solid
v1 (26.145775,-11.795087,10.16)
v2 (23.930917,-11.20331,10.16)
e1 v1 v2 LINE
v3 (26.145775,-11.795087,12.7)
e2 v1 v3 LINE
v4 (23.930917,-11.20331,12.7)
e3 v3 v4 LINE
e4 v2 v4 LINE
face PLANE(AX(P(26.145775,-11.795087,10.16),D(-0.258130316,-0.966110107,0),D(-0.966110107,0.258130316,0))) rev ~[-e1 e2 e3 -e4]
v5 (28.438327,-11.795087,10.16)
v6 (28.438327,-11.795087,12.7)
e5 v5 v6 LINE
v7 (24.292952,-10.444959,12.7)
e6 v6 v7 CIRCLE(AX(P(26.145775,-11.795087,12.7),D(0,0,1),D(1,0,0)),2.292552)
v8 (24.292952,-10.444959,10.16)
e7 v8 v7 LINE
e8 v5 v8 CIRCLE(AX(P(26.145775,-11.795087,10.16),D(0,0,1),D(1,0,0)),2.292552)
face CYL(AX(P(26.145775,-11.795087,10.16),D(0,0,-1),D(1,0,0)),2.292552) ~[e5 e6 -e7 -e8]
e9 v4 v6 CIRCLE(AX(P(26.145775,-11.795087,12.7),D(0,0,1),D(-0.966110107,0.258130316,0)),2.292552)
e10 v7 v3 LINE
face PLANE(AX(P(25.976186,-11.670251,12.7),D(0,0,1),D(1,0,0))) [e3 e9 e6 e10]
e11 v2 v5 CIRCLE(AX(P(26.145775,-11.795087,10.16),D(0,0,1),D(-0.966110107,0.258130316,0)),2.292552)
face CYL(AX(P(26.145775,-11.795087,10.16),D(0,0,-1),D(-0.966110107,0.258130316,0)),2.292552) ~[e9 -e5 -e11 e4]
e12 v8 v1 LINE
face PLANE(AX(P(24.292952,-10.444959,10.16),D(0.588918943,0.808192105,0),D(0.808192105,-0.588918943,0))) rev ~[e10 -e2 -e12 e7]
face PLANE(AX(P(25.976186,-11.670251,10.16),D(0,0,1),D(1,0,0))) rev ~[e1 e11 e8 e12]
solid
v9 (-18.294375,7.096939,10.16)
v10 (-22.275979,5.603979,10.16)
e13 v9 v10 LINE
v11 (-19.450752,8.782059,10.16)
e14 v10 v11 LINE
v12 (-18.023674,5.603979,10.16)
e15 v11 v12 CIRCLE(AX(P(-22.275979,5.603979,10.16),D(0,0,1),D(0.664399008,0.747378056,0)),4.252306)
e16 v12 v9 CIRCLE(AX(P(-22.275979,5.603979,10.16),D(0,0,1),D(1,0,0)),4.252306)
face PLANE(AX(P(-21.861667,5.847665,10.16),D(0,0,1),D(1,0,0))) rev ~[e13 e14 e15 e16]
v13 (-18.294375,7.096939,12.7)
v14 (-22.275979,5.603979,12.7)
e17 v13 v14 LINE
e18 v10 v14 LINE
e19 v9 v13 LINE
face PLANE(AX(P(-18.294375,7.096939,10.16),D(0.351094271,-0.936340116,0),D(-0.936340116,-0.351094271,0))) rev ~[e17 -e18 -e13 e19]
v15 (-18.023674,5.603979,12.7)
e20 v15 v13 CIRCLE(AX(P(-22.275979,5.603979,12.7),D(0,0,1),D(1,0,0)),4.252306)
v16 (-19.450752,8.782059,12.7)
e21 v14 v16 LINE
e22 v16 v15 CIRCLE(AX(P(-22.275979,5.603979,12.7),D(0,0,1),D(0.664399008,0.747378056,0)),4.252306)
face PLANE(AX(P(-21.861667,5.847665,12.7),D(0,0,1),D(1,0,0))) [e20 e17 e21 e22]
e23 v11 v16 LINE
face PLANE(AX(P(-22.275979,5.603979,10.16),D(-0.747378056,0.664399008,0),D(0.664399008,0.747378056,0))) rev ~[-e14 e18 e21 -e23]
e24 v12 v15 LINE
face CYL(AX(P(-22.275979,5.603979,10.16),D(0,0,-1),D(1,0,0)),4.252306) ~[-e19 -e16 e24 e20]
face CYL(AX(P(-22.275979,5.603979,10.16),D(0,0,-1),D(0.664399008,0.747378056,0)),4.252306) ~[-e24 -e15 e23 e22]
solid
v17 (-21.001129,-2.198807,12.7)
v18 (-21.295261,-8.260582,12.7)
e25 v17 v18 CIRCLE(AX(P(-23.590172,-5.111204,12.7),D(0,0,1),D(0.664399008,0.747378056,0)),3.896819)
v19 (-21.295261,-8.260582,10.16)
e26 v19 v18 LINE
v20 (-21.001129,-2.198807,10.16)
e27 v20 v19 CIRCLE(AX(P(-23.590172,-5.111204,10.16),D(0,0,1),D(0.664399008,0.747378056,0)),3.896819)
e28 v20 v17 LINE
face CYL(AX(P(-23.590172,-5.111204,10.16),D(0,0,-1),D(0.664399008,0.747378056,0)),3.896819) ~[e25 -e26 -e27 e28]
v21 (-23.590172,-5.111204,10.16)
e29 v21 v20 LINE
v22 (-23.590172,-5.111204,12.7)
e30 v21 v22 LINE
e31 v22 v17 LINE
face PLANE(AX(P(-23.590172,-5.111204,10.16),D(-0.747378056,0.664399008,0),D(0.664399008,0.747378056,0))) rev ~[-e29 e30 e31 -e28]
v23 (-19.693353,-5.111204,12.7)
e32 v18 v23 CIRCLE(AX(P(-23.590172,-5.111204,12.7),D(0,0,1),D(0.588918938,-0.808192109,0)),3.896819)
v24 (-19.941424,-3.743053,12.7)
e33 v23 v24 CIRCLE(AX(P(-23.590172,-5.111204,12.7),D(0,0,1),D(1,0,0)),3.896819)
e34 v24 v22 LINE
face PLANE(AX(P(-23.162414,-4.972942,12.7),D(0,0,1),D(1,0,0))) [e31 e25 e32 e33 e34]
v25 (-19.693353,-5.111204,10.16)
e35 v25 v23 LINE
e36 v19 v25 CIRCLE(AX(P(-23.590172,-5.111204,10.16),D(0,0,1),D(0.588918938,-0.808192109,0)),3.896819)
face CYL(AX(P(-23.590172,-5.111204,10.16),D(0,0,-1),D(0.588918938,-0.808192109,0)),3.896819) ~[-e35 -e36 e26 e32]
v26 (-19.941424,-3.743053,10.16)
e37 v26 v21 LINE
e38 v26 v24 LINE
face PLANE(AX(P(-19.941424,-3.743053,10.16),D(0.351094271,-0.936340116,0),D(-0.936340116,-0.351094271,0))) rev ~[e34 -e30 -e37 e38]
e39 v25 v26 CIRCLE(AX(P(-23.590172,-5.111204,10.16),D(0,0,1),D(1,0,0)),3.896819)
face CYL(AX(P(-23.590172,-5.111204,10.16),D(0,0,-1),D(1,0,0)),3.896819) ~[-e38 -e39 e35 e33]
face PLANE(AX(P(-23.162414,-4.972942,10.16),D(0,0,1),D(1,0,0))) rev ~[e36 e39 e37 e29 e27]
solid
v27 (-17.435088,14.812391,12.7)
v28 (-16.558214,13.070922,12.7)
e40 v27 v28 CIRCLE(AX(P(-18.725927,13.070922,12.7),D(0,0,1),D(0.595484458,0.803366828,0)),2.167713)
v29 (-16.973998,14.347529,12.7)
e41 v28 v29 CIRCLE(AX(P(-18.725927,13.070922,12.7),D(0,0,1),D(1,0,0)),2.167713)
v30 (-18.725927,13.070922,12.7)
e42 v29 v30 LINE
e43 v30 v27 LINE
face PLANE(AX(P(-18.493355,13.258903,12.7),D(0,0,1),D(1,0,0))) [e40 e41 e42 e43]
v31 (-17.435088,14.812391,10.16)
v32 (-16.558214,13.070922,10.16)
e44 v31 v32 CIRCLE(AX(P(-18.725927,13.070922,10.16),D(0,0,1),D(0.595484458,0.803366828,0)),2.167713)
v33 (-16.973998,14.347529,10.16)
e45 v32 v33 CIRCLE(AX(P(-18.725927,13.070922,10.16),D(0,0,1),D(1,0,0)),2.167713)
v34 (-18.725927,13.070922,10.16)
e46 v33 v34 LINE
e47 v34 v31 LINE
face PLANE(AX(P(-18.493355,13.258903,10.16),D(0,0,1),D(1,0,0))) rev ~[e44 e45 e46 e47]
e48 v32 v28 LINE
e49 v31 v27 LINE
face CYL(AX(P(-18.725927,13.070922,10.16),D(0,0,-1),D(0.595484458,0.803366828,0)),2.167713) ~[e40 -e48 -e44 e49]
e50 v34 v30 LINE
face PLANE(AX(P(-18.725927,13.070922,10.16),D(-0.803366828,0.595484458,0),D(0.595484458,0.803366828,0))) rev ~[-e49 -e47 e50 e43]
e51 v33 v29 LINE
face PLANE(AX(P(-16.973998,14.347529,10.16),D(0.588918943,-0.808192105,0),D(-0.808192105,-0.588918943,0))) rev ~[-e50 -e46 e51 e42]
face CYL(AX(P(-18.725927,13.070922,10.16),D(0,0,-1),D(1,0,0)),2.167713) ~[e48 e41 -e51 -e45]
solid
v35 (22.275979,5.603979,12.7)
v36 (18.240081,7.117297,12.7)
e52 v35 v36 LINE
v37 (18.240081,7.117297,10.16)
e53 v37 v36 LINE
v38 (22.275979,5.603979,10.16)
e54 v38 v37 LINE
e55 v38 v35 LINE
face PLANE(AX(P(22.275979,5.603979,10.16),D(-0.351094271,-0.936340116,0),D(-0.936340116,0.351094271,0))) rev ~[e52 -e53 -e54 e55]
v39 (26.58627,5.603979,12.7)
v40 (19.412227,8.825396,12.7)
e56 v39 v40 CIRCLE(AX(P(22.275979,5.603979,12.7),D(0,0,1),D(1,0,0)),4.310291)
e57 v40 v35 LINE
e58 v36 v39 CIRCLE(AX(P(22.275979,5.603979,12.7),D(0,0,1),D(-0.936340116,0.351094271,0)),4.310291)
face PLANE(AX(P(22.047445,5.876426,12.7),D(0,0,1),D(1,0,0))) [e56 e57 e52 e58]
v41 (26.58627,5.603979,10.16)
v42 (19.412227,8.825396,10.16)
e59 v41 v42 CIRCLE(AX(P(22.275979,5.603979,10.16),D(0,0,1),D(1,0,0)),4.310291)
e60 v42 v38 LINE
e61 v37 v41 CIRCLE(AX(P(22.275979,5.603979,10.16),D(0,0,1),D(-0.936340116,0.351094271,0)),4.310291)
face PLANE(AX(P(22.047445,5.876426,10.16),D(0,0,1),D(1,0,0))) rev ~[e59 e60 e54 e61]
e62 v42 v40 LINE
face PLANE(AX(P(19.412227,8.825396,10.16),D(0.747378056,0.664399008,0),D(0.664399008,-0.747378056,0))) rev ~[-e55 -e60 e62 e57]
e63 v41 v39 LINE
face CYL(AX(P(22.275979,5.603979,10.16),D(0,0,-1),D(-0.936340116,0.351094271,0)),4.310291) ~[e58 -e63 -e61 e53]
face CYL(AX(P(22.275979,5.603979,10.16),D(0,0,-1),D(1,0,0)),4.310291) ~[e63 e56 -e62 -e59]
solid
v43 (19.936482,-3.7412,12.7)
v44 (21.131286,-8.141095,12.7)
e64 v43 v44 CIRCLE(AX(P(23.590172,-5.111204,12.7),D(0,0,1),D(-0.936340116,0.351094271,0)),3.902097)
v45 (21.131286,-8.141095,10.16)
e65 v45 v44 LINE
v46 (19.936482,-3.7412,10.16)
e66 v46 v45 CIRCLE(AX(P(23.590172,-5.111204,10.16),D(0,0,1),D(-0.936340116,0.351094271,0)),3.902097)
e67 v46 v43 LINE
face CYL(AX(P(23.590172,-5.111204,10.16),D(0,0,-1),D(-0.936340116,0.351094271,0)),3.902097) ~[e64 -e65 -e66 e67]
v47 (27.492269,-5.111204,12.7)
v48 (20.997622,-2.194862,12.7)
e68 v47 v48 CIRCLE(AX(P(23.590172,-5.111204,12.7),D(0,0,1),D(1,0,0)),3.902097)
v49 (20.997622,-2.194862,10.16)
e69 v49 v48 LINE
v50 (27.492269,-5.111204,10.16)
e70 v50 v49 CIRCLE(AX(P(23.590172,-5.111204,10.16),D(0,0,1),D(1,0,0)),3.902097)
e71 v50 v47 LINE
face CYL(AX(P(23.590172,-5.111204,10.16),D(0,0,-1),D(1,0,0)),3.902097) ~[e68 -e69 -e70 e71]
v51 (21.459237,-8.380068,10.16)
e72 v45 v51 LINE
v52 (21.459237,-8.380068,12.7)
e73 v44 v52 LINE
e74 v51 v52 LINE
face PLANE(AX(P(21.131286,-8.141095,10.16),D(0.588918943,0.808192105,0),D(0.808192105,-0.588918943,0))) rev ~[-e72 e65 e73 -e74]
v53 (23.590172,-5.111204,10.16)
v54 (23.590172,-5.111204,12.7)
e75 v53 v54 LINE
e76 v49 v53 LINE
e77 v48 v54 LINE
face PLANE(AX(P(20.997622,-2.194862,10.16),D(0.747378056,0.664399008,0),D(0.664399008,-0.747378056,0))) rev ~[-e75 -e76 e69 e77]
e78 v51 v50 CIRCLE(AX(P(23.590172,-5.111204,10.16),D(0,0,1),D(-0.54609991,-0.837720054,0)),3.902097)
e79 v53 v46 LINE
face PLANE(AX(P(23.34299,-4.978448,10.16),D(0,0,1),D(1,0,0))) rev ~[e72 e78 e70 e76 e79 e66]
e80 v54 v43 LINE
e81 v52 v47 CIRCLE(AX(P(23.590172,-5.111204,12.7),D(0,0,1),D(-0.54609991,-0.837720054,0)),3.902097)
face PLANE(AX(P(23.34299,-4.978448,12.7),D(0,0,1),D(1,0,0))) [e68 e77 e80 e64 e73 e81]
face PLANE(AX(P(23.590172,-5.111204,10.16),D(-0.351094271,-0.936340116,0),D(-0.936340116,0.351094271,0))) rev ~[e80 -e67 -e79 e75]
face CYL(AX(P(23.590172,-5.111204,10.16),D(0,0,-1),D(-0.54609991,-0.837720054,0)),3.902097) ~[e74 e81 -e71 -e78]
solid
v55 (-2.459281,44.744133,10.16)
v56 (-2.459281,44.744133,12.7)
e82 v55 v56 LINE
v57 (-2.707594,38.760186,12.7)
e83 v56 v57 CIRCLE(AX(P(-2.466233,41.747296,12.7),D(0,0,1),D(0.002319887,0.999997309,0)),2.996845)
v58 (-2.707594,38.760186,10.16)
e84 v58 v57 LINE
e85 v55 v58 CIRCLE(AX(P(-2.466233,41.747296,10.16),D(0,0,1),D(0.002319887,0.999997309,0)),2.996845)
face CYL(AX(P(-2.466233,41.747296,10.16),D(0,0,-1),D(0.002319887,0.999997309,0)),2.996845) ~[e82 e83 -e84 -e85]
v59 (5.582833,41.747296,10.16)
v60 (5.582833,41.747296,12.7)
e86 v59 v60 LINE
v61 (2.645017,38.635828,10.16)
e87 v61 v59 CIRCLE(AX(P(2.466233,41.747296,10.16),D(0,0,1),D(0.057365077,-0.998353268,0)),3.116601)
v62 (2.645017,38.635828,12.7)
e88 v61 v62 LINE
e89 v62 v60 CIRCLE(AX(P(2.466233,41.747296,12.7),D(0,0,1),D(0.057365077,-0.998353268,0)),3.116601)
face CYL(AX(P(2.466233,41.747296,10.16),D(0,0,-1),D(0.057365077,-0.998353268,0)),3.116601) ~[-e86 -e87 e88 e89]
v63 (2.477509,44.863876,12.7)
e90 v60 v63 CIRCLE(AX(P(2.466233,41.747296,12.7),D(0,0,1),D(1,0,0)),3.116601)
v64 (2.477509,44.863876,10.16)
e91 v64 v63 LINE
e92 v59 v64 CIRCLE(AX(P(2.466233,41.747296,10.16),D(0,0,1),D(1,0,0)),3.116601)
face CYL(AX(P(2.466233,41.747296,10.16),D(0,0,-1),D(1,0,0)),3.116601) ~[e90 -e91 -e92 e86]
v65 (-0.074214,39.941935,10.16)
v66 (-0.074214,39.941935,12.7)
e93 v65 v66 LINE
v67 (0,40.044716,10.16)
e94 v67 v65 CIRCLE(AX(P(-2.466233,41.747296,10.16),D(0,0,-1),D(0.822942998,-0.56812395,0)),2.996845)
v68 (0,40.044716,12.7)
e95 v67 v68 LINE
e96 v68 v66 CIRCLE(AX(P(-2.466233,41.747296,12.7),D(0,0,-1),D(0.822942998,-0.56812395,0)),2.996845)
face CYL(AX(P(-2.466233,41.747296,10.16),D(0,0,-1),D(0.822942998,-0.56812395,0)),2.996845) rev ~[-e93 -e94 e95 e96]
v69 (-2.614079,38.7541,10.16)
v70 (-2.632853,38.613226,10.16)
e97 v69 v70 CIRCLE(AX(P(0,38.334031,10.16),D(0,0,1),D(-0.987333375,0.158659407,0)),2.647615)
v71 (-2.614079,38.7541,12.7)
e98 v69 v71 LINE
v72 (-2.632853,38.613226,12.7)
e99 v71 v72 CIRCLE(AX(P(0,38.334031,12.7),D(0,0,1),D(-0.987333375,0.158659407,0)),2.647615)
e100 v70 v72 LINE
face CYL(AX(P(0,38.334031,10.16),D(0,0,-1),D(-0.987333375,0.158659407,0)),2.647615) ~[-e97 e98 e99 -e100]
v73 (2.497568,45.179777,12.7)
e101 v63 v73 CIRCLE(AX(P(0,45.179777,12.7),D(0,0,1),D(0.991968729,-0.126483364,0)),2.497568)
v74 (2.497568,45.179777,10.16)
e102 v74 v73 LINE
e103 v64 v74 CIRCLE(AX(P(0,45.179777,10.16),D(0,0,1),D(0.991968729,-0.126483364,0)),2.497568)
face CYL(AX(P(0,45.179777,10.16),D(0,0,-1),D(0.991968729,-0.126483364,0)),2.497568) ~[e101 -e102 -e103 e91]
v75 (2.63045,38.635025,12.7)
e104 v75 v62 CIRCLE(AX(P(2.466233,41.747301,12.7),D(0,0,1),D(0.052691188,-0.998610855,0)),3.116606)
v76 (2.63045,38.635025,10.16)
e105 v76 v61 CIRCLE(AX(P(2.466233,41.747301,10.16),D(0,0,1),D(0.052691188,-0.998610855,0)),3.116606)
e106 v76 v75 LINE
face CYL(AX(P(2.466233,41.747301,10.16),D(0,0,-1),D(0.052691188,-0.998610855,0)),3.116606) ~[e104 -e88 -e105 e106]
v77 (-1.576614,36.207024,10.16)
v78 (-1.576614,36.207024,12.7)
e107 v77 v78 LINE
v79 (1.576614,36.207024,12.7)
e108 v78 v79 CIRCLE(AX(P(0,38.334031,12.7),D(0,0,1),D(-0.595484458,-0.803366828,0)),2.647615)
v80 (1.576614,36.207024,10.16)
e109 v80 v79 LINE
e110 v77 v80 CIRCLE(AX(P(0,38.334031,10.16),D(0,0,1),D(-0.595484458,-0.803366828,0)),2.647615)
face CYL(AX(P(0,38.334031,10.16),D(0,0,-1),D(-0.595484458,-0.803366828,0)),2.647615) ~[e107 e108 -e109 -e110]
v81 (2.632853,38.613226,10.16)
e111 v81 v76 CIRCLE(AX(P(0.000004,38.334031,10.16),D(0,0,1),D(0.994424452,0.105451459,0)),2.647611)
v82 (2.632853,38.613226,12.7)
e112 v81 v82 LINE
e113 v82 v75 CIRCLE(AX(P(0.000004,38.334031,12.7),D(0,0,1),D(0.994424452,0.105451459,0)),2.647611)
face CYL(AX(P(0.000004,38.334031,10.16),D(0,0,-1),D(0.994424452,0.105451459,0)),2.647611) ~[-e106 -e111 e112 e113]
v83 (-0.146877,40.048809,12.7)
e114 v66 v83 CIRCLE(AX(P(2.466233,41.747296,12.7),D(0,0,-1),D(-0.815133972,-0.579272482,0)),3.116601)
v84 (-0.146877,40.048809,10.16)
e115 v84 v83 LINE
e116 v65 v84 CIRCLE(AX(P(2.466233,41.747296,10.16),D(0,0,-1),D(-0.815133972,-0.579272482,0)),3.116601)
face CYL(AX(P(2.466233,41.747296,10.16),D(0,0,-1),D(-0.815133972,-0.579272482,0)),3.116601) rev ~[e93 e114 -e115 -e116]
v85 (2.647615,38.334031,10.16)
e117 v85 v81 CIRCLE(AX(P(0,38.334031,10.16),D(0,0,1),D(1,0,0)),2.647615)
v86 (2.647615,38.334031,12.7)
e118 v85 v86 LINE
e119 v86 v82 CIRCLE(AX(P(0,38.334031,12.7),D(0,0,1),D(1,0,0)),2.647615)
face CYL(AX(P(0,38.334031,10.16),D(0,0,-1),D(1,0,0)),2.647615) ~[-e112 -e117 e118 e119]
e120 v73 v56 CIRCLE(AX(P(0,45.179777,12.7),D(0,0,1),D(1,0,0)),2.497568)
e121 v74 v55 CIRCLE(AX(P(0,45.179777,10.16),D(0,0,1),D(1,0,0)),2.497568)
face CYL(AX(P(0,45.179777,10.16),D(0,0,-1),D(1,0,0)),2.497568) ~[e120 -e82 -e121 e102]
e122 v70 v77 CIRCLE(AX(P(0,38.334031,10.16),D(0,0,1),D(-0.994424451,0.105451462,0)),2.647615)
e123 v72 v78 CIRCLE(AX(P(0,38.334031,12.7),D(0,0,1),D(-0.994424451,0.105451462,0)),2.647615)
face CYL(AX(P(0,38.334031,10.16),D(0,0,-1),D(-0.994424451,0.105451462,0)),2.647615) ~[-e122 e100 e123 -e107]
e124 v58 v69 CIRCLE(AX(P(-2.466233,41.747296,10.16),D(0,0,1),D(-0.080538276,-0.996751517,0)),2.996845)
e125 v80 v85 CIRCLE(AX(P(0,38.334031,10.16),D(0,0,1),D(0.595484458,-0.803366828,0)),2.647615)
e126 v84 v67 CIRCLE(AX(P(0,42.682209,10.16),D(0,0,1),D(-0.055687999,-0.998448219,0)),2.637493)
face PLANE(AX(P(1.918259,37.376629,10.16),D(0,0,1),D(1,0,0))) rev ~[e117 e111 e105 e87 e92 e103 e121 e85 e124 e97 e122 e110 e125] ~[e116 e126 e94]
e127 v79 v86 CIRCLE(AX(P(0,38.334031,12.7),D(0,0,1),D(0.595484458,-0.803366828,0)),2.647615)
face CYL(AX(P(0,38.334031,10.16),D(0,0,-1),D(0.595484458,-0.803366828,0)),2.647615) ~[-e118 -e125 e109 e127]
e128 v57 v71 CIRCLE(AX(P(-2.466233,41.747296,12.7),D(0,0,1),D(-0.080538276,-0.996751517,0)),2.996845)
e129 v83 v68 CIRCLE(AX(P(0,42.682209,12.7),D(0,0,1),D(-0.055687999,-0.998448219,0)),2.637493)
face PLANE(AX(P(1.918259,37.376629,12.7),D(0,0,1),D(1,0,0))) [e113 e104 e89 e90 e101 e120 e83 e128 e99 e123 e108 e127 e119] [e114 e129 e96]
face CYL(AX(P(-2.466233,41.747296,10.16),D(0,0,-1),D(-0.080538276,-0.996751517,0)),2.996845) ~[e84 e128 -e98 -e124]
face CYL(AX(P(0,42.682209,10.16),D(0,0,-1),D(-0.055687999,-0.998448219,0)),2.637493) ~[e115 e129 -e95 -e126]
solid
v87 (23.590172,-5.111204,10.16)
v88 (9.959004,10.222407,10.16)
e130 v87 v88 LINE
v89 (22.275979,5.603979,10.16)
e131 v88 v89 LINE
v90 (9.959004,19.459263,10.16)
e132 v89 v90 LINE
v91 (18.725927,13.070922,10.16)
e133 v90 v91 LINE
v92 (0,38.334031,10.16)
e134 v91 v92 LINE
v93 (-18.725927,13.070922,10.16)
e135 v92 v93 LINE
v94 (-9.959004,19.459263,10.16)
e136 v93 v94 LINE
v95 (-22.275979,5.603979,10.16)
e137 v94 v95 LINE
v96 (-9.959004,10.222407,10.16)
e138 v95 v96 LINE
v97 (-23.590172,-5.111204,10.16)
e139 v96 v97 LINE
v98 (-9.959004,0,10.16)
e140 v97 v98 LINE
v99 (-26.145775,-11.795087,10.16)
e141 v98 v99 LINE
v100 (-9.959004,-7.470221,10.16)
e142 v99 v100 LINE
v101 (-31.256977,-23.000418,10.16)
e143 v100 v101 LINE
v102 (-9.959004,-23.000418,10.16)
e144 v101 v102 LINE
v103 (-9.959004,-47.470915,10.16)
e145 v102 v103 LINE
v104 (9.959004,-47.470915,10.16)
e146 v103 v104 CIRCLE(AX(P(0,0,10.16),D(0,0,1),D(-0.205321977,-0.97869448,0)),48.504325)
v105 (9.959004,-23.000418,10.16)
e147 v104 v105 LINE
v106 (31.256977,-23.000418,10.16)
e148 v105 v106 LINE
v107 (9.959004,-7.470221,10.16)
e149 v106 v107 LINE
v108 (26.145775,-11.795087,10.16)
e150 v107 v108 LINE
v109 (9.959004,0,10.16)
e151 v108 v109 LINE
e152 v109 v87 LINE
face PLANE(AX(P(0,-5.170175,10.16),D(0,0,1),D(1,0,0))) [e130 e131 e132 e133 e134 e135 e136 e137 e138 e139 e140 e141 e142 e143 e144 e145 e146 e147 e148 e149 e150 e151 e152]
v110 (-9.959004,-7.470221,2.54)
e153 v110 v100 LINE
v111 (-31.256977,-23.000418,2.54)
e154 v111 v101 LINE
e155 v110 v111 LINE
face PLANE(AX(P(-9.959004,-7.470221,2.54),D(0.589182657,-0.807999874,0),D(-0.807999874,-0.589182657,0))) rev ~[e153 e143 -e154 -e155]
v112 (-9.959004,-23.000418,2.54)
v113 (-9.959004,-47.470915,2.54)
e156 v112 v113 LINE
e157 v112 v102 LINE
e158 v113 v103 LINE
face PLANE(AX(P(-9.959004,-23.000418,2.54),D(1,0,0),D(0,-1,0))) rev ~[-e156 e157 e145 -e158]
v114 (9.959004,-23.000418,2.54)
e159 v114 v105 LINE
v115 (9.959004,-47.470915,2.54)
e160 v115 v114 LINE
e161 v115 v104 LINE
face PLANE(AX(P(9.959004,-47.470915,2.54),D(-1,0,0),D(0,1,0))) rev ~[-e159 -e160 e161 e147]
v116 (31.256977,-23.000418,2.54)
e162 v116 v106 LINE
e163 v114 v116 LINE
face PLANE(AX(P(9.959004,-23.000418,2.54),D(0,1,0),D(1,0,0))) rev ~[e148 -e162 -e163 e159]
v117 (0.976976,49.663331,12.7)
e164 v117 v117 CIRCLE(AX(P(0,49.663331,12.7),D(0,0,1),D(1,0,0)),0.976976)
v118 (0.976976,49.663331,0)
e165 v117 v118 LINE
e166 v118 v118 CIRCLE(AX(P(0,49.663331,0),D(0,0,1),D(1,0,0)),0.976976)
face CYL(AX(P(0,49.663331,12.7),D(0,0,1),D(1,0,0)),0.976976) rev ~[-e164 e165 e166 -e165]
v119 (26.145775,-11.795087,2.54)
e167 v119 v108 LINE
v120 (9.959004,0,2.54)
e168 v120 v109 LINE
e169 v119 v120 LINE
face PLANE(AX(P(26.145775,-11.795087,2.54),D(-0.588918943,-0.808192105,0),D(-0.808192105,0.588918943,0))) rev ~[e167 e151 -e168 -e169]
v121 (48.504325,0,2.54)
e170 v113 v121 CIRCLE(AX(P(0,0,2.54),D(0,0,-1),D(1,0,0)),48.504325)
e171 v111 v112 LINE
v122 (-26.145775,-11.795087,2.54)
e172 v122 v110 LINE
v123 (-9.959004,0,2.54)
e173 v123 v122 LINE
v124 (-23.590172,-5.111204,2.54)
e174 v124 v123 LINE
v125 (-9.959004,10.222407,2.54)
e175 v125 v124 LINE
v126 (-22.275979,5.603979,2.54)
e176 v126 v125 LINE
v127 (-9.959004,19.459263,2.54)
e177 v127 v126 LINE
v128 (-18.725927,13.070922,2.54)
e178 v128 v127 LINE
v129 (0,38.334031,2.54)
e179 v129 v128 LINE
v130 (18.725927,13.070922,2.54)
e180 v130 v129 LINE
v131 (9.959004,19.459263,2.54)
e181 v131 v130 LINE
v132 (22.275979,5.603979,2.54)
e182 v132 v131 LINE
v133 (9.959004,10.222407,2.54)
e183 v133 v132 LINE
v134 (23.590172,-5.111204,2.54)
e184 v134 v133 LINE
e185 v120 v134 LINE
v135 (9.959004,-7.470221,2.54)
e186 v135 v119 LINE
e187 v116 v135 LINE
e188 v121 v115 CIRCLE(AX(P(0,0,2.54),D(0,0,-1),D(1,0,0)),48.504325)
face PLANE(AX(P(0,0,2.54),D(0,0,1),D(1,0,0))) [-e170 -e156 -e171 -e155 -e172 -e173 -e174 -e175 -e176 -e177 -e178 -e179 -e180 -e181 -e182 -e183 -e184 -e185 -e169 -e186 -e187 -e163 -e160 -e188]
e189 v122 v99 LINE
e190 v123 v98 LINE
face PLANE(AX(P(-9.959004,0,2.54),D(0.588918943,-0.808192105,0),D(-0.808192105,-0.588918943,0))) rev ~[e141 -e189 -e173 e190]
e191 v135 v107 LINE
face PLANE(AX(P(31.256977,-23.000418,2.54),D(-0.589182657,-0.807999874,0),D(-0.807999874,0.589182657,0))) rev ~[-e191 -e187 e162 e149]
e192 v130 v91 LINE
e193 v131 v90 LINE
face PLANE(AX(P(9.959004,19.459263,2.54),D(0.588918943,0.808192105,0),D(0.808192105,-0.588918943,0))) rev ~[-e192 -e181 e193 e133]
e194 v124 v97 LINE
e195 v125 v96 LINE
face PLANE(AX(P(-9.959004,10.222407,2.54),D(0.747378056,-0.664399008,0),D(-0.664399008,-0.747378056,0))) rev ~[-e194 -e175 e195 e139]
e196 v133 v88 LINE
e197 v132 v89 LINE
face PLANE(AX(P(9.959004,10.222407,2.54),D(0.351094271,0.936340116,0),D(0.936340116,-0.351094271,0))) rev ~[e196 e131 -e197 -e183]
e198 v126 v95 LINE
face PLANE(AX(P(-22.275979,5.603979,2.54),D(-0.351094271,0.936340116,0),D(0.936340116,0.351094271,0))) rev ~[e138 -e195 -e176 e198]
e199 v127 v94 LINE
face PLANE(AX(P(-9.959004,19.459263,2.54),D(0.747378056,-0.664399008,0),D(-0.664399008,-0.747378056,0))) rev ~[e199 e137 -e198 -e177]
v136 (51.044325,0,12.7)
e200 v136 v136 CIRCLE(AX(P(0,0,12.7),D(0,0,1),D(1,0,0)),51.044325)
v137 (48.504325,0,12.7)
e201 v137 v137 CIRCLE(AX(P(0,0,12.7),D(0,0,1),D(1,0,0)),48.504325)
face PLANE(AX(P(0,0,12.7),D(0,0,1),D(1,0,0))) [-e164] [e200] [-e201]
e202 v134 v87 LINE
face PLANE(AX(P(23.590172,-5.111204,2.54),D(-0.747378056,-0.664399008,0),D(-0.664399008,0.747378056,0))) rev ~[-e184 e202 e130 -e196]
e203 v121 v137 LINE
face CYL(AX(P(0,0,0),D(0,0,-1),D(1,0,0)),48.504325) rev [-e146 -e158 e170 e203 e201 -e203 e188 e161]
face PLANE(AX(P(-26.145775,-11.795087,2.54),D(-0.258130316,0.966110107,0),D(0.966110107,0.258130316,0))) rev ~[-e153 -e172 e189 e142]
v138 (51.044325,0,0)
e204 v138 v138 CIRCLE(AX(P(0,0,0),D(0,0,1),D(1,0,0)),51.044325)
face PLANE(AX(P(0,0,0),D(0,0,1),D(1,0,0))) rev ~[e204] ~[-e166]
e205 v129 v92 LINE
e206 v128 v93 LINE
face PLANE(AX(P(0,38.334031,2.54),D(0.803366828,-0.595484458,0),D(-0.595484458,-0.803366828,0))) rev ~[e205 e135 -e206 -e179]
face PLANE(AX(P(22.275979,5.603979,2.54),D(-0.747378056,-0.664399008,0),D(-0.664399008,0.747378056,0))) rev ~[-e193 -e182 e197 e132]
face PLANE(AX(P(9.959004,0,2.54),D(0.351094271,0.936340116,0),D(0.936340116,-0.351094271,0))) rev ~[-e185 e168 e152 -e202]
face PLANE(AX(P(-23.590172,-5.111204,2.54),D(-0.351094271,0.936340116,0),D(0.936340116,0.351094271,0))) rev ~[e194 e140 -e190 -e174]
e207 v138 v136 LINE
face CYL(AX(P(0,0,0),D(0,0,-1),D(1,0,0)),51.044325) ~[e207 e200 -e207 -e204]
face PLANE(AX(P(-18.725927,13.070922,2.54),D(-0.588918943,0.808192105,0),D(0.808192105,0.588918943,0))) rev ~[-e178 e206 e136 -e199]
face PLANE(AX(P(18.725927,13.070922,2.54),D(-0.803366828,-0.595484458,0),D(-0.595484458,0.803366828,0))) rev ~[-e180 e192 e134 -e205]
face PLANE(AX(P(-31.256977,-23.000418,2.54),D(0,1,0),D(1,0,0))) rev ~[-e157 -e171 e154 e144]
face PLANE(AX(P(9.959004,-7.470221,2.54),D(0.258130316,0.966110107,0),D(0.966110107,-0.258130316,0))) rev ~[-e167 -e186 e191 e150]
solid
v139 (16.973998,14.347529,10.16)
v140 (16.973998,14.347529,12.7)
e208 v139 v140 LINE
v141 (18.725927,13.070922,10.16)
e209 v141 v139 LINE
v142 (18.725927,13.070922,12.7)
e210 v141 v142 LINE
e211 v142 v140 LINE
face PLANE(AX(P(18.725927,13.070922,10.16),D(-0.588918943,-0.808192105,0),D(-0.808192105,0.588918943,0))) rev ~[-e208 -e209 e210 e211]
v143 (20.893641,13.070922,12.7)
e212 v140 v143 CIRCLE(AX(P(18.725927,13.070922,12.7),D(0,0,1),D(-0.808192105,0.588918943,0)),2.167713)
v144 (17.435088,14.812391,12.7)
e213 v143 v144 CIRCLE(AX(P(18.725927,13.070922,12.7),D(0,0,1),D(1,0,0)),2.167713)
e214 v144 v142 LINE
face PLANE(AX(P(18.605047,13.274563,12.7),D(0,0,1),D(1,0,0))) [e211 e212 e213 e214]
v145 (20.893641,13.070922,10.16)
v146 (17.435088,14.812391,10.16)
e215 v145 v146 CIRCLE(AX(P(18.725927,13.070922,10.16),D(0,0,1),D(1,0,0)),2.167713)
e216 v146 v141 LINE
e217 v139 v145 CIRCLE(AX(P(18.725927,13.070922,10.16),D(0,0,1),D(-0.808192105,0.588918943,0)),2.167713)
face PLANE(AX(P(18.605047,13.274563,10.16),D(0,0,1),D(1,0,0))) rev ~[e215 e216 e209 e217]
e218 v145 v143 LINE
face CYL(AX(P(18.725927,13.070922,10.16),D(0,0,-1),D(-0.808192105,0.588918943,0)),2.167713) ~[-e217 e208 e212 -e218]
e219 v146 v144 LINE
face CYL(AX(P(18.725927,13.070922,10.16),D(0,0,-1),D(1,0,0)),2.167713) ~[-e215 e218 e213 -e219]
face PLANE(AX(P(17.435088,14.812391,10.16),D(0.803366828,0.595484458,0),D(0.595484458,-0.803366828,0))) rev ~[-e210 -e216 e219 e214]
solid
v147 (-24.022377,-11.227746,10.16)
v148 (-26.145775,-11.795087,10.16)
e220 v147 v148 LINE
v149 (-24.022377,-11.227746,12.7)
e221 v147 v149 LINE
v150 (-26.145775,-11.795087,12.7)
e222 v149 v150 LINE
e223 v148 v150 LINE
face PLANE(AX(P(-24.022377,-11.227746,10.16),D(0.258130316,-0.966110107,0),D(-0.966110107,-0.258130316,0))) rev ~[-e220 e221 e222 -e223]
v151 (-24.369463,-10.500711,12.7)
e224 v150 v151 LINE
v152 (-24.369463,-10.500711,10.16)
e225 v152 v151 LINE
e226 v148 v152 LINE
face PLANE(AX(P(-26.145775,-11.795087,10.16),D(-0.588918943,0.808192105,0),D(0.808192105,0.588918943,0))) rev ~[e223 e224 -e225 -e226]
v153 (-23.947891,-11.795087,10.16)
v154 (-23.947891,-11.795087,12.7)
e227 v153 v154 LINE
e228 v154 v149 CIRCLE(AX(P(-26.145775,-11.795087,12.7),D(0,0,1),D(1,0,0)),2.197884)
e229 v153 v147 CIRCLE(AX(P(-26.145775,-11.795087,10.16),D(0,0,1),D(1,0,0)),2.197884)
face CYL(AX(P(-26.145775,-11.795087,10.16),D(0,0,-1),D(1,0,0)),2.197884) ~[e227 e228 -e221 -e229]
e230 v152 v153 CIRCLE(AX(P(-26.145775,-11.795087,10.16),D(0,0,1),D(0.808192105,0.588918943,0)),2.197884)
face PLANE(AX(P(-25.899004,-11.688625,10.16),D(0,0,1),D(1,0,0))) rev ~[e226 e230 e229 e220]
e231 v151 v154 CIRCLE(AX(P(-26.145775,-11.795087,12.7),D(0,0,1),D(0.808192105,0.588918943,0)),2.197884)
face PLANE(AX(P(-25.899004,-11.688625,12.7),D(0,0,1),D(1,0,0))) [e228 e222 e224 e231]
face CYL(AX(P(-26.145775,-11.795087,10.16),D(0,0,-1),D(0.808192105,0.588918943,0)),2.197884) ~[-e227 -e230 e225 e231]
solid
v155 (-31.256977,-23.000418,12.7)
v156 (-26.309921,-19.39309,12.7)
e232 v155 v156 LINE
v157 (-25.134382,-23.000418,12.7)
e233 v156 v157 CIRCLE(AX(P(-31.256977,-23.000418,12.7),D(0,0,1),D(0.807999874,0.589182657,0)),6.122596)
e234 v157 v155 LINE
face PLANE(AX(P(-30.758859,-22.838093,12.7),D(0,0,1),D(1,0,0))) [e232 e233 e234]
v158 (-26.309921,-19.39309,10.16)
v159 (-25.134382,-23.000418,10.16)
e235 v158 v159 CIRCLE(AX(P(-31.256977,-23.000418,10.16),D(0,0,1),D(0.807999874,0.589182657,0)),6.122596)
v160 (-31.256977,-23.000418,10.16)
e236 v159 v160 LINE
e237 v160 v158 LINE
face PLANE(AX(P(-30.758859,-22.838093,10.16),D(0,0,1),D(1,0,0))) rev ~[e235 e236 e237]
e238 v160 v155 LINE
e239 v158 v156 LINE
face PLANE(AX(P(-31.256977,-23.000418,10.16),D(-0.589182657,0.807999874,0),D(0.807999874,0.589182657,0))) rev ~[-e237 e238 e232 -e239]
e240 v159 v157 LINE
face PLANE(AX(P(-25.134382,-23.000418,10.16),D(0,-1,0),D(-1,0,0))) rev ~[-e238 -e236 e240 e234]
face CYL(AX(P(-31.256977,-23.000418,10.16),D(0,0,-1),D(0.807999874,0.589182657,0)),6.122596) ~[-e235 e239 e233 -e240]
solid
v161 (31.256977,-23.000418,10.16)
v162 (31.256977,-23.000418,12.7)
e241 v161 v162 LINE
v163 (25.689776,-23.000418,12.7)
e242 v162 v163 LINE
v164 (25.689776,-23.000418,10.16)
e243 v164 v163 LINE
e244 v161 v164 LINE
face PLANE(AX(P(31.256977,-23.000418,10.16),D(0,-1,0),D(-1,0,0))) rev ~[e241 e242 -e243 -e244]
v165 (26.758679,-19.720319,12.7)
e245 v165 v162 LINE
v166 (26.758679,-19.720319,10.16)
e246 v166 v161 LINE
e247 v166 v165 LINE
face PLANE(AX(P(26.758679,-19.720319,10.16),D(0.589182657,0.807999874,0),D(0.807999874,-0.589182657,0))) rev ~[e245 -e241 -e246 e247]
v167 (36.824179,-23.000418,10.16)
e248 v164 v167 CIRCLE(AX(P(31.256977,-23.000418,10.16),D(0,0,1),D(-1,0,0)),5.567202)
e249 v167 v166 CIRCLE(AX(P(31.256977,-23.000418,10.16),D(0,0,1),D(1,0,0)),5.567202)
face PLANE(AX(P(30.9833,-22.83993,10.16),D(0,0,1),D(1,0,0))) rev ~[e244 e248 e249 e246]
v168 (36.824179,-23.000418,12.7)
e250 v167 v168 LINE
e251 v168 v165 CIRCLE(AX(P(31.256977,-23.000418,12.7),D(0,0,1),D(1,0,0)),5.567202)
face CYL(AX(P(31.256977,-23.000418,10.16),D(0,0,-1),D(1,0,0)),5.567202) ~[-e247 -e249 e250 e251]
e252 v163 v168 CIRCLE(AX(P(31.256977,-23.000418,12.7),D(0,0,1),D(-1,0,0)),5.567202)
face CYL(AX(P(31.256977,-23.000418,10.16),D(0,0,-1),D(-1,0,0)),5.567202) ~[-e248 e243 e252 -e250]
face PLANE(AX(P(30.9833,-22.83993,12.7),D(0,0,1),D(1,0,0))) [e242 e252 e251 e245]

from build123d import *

# Parameters (mm, degrees)
F0_R     = 51.0443252187
F1_DEPTH = 12.7
F2_T     = -2.54
F4_DEPTH = 7.62
F6_DEPTH = 2.54
F7_R     = 0.97697595
F8_DEPTH = 12.701


with BuildPart() as f1:
    # F0 (on Top) → F1 (new body)
    with BuildSketch(Plane.XY):
        Circle(F0_R)
    extrude(amount=F1_DEPTH)

    # F2
    f2_openings = [f1.faces().sort_by_distance(p)[0] for p in [
        (0, 0, 12.7),
    ]]
    offset(amount=F2_T, openings=f2_openings)

    # F3 (on face) → F4 (join)
    with BuildSketch(Plane.XY.offset(2.54)):
        with BuildLine():
            Line((-9.9590039442, -23.0004175437), (-9.9590039442, -47.4709153626))
            ThreePointArc((-9.9590039442, -47.4709153626), (0, -48.5043252187), (9.9590039442, -47.4709153626))
            Line((9.9590039442, -47.4709153626), (9.9590039442, -23.0004175437))
            Line((9.9590039442, -23.0004175437), (31.2569774687, -23.0004175437))
            Line((31.2569774687, -23.0004175437), (9.9590039442, -7.4702212587))
            Line((9.9590039442, -7.4702212587), (26.1457748711, -11.7950867862))
            Line((26.1457748711, -11.7950867862), (9.9590039442, 0))
            Line((9.9590039442, 0), (23.5901717097, -5.1112035289))
            Line((23.5901717097, -5.1112035289), (9.9590039442, 10.2224070579))
            Line((9.9590039442, 10.2224070579), (22.2759793267, 5.6039789728))
            Line((22.2759793267, 5.6039789728), (9.9590039442, 19.4592632281))
            Line((9.9590039442, 19.4592632281), (18.725927211, 13.0709217086))
            Line((18.725927211, 13.0709217086), (0, 38.334030658))
            Line((0, 38.334030658), (-18.725927211, 13.0709217086))
            Line((-18.725927211, 13.0709217086), (-9.9590039442, 19.4592632281))
            Line((-9.9590039442, 19.4592632281), (-22.2759793267, 5.6039789728))
            Line((-22.2759793267, 5.6039789728), (-9.9590039442, 10.2224070579))
            Line((-9.9590039442, 10.2224070579), (-23.5901717097, -5.1112035289))
            Line((-23.5901717097, -5.1112035289), (-9.9590039442, 0))
            Line((-9.9590039442, 0), (-26.1457748711, -11.7950867862))
            Line((-26.1457748711, -11.7950867862), (-9.9590039442, -7.4702212587))
            Line((-9.9590039442, -7.4702212587), (-31.2569774687, -23.0004175437))
            Line((-31.2569774687, -23.0004175437), (-9.9590039442, -23.0004175437))
        make_face()
    extrude(amount=F4_DEPTH)

    # F7 (on face) → F8 (cut, through all)
    with BuildSketch(Plane.XY.offset(12.7)):
        with Locations((0, 49.6633313596)):
            Circle(F7_R)
    extrude(amount=-F8_DEPTH, mode=Mode.SUBTRACT)


with BuildPart() as f6:
    # F5 (on face) → F6 (new body)
    with BuildSketch(Plane.XY.offset(10.16)):
        with BuildLine():
            ThreePointArc((16.9739983826, 14.347529172), (18.0546218787, 11.0097738764), (20.8936405766, 13.0709217086))
            ThreePointArc((20.8936405766, 13.0709217086), (19.7008146252, 15.0070456109), (17.4350875922, 14.8123907189))
            Line((17.4350875922, 14.8123907189), (18.725927211, 13.0709217086))
            Line((18.725927211, 13.0709217086), (16.9739983826, 14.347529172))
        make_face()
    extrude(amount=F6_DEPTH)


with BuildPart() as f6b:
    # F5 (on face) → F6, piece 2 (new body)
    with BuildSketch(Plane.XY.offset(10.16)):
        with BuildLine():
            Line((0.8599322454, 37.1738978773), (1.576613661, 36.2070244895))
            ThreePointArc((1.576613661, 36.2070244895), (2.364754962, 37.1433166508), (2.6476151301, 38.334030658))
            ThreePointArc((2.6476151301, 38.334030658), (2.6439220776, 38.4738230919), (2.6328532228, 38.6132255441))
            ThreePointArc((2.6328532228, 38.6132255441), (1.8888630482, 37.7180710186), (0.8599322454, 37.1738978773))
        make_face()
        with BuildLine():
            ThreePointArc((-1.576613661, 36.2070244895), (0, 35.6864155279), (1.576613661, 36.2070244895))
            Line((1.576613661, 36.2070244895), (0.8599322454, 37.1738978773))
            ThreePointArc((0.8599322454, 37.1738978773), (0, 37.0478709781), (-0.8599322454, 37.1738978773))
            Line((-0.8599322454, 37.1738978773), (-1.576613661, 36.2070244895))
        make_face()
        with BuildLine():
            ThreePointArc((-2.6328532228, 38.6132255441), (-2.4243254196, 37.269835123), (-1.576613661, 36.2070244895))
            Line((-1.576613661, 36.2070244895), (-0.8599322454, 37.1738978773))
            ThreePointArc((-0.8599322454, 37.1738978773), (-1.8888630482, 37.7180710186), (-2.6328532228, 38.6132255441))
        make_face()
        with BuildLine():
            Line((0, 38.334030658), (0.8599322454, 37.1738978773))
            ThreePointArc((0.8599322454, 37.1738978773), (1.8888630482, 37.7180710186), (2.6328532228, 38.6132255441))
            ThreePointArc((2.6328532228, 38.6132255441), (2.6316742989, 38.6241276448), (2.6304502318, 38.6350247691))
            ThreePointArc((2.6304502318, 38.6350247691), (1.110275511, 38.9411279487), (-0.0742141044, 39.9419349677))
            ThreePointArc((-0.0742141044, 39.9419349677), (-1.1966596727, 39.0326567395), (-2.614078781, 38.7540997044))
            ThreePointArc((-2.614078781, 38.7540997044), (-2.6244114093, 38.6837886197), (-2.6328532228, 38.6132255441))
            ThreePointArc((-2.6328532228, 38.6132255441), (-1.8888630482, 37.7180710186), (-0.8599322454, 37.1738978773))
            Line((-0.8599322454, 37.1738978773), (0, 38.334030658))
        make_face()
        with BuildLine():
            ThreePointArc((-0.8599322454, 37.1738978773), (0, 37.0478709781), (0.8599322454, 37.1738978773))
            Line((0.8599322454, 37.1738978773), (0, 38.334030658))
            Line((0, 38.334030658), (-0.8599322454, 37.1738978773))
        make_face()
        with BuildLine():
            ThreePointArc((-2.4592805273, 44.7441331542), (-5.4605012905, 41.8715476694), (-2.7075936217, 38.7601857805))
            ThreePointArc((-2.7075936217, 38.7601857805), (-2.9871101183, 40.2860770487), (-2.4662328709, 41.7472958987))
            ThreePointArc((-2.4662328709, 41.7472958987), (-2.6251055728, 42.9375271186), (-2.2398557502, 44.0748368681))
            ThreePointArc((-2.2398557502, 44.0748368681), (-2.3732803918, 44.4017110911), (-2.4592805273, 44.7441331542))
        make_face()
        with BuildLine():
            ThreePointArc((-2.4662328709, 41.7472958987), (-2.9871101183, 40.2860770487), (-2.7075936217, 38.7601857805))
            ThreePointArc((-2.7075936217, 38.7601857805), (-2.6608599921, 38.7567771888), (-2.614078781, 38.7540997044))
            ThreePointArc((-2.614078781, 38.7540997044), (-2.2383831472, 39.7480698241), (-1.5021368627, 40.5142716361))
            ThreePointArc((-1.5021368627, 40.5142716361), (-2.0777576359, 41.057619649), (-2.4662328709, 41.7472958987))
        make_face()
        with BuildLine():
            ThreePointArc((-1.5021368627, 40.5142716361), (-2.2383831472, 39.7480698241), (-2.614078781, 38.7540997044))
            ThreePointArc((-2.614078781, 38.7540997044), (-1.1966596727, 39.0326567395), (-0.0742141044, 39.9419349677))
            ThreePointArc((-0.0742141044, 39.9419349677), (-0.1110994221, 39.9949953603), (-0.1468766842, 40.0488091079))
            ThreePointArc((-0.1468766842, 40.0488091079), (-0.8567235615, 40.1877366237), (-1.5021368627, 40.5142716361))
        make_face()
        with BuildLine():
            ThreePointArc((2.6304502318, 38.6350247691), (2.6377340362, 38.6354176434), (2.6450169011, 38.6358275643))
            ThreePointArc((2.6450169011, 38.6358275643), (2.9075581156, 39.3186393908), (2.9968453198, 40.0447162979))
            ThreePointArc((2.9968453198, 40.0447162979), (2.8611186892, 40.9363898464), (2.4662328709, 41.7472958987))
            ThreePointArc((2.4662328709, 41.7472958987), (2.0777576359, 41.057619649), (1.5021368627, 40.5142716361))
            ThreePointArc((1.5021368627, 40.5142716361), (2.2699033504, 39.6968969966), (2.6304502318, 38.6350247691))
        make_face()
        with BuildLine():
            ThreePointArc((2.9968453198, 40.0447162979), (2.9075581156, 39.3186393908), (2.6450169011, 38.6358275643))
            ThreePointArc((2.6450169011, 38.6358275643), (4.7323305443, 39.6076697023), (5.5828334109, 41.7472958987))
            ThreePointArc((5.5828334109, 41.7472958987), (4.6739855016, 43.9470748075), (2.4775093982, 44.8638760382))
            ThreePointArc((2.4775093982, 44.8638760382), (2.3914491817, 44.4594873566), (2.2398557502, 44.0748368681))
            ThreePointArc((2.2398557502, 44.0748368681), (2.5361357873, 43.4063510394), (2.6374925045, 42.6822088024))
            ThreePointArc((2.6374925045, 42.6822088024), (2.5943243265, 42.2069741237), (2.4662328709, 41.7472958987))
            ThreePointArc((2.4662328709, 41.7472958987), (2.8611186892, 40.9363898464), (2.9968453198, 40.0447162979))
        make_face()
        with BuildLine():
            ThreePointArc((-0.0742141044, 39.9419349677), (1.110275511, 38.9411279487), (2.6304502318, 38.6350247691))
            ThreePointArc((2.6304502318, 38.6350247691), (2.2699033504, 39.6968969966), (1.5021368627, 40.5142716361))
            ThreePointArc((1.5021368627, 40.5142716361), (0.7869080902, 40.1648406592), (0, 40.0447162979))
            ThreePointArc((0, 40.0447162979), (-0.0365635017, 39.9929331577), (-0.0742141044, 39.9419349677))
        make_face()
        with BuildLine():
            ThreePointArc((-0.9725766756, 42.879354984), (-1.8101773995, 42.4330922426), (-2.4662328709, 41.7472958987))
            ThreePointArc((-2.4662328709, 41.7472958987), (-2.0777576359, 41.057619649), (-1.5021368627, 40.5142716361))
            ThreePointArc((-1.5021368627, 40.5142716361), (-1.04170417, 40.7681050815), (-0.540192524, 40.9259523223))
            ThreePointArc((-0.540192524, 40.9259523223), (-0.6492138876, 41.832092248), (-0.491063748, 42.7309602894))
            ThreePointArc((-0.491063748, 42.7309602894), (-0.7355719331, 42.7929840054), (-0.9725766756, 42.879354984))
        make_face()
        with BuildLine():
            ThreePointArc((-2.2398557502, 44.0748368681), (-2.6251055728, 42.9375271186), (-2.4662328709, 41.7472958987))
            ThreePointArc((-2.4662328709, 41.7472958987), (-1.8101773995, 42.4330922426), (-0.9725766756, 42.879354984))
            ThreePointArc((-0.9725766756, 42.879354984), (-1.7138333514, 43.363015613), (-2.2398557502, 44.0748368681))
        make_face()
        with BuildLine():
            ThreePointArc((-1.7484128812, 44.6569034897), (-2.1012315183, 44.7218304646), (-2.4592805273, 44.7441331542))
            ThreePointArc((-2.4592805273, 44.7441331542), (-2.3732803918, 44.4017110911), (-2.2398557502, 44.0748368681))
            ThreePointArc((-2.2398557502, 44.0748368681), (-2.0152597989, 44.3837065703), (-1.7484128812, 44.6569034897))
        make_face()
        with BuildLine():
            ThreePointArc((2.497568045, 45.1797768474), (-0.2186614743, 47.6677546003), (-2.4592805273, 44.7441331542))
            ThreePointArc((-2.4592805273, 44.7441331542), (-2.1012315183, 44.7218304646), (-1.7484128812, 44.6569034897))
            ThreePointArc((-1.7484128812, 44.6569034897), (-0.0734668488, 45.3186779058), (1.6357329288, 44.7512048141))
            ThreePointArc((1.6357329288, 44.7512048141), (2.052765276, 44.8363480954), (2.4775093982, 44.8638760382))
            ThreePointArc((2.4775093982, 44.8638760382), (2.4925483389, 45.0215083488), (2.497568045, 45.1797768474))
        make_face()
        with BuildLine():
            ThreePointArc((-0.540192524, 40.9259523223), (-1.04170417, 40.7681050815), (-1.5021368627, 40.5142716361))
            ThreePointArc((-1.5021368627, 40.5142716361), (-0.8567235615, 40.1877366237), (-0.1468766842, 40.0488091079))
            ThreePointArc((-0.1468766842, 40.0488091079), (-0.3775565584, 40.4721250838), (-0.540192524, 40.9259523223))
        make_face()
        with BuildLine():
            ThreePointArc((0.421999424, 40.947798506), (0.986185327, 40.7911233257), (1.5021368627, 40.5142716361))
            ThreePointArc((1.5021368627, 40.5142716361), (2.0777576359, 41.057619649), (2.4662328709, 41.7472958987))
            ThreePointArc((2.4662328709, 41.7472958987), (1.8101773995, 42.4330922426), (0.9725766756, 42.879354984))
            ThreePointArc((0.9725766756, 42.879354984), (0.677480511, 42.7758495822), (0.3717630065, 42.7100322439))
            ThreePointArc((0.3717630065, 42.7100322439), (0.4906334207, 42.2351725265), (0.5306124489, 41.7472958987))
            ThreePointArc((0.5306124489, 41.7472958987), (0.5033350527, 41.3438752528), (0.421999424, 40.947798506))
        make_face()
        with BuildLine():
            ThreePointArc((0, 40.0447162979), (0.7869080902, 40.1648406592), (1.5021368627, 40.5142716361))
            ThreePointArc((1.5021368627, 40.5142716361), (0.986185327, 40.7911233257), (0.421999424, 40.947798506))
            ThreePointArc((0.421999424, 40.947798506), (0.248811083, 40.4785886043), (0, 40.0447162979))
        make_face()
        with BuildLine():
            ThreePointArc((-1.7484128812, 44.6569034897), (-2.0152597989, 44.3837065703), (-2.2398557502, 44.0748368681))
            ThreePointArc((-2.2398557502, 44.0748368681), (-1.7138333514, 43.363015613), (-0.9725766756, 42.879354984))
            ThreePointArc((-0.9725766756, 42.879354984), (-0.6797144374, 42.9634609175), (-0.3798256388, 43.0173942749))
            ThreePointArc((-0.3798256388, 43.0173942749), (-0.2402846028, 43.2925991344), (-0.0742141044, 43.5526568298))
            ThreePointArc((-0.0742141044, 43.5526568298), (-0.8161981913, 44.2489888109), (-1.7484128812, 44.6569034897))
        make_face()
        with BuildLine():
            ThreePointArc((-0.3798256388, 43.0173942749), (-0.6797144374, 42.9634609175), (-0.9725766756, 42.879354984))
            ThreePointArc((-0.9725766756, 42.879354984), (-0.7355719331, 42.7929840054), (-0.491063748, 42.7309602894))
            ThreePointArc((-0.491063748, 42.7309602894), (-0.4389768968, 42.8755490315), (-0.3798256388, 43.0173942749))
        make_face()
        with BuildLine():
            ThreePointArc((1.6357329288, 44.7512048141), (-0.0734668488, 45.3186779058), (-1.7484128812, 44.6569034897))
            ThreePointArc((-1.7484128812, 44.6569034897), (-0.8161981913, 44.2489888109), (-0.0742141044, 43.5526568298))
            ThreePointArc((-0.0742141044, 43.5526568298), (0.6773924371, 44.2994026418), (1.6357329288, 44.7512048141))
        make_face()
        with BuildLine():
            ThreePointArc((-0.540192524, 40.9259523223), (-0.3775565584, 40.4721250838), (-0.1468766842, 40.0488091079))
            ThreePointArc((-0.1468766842, 40.0488091079), (-0.0734668488, 40.045739699), (0, 40.0447162979))
            ThreePointArc((0, 40.0447162979), (0.248811083, 40.4785886043), (0.421999424, 40.947798506))
            ThreePointArc((0.421999424, 40.947798506), (-0.0600975553, 40.9809636305), (-0.540192524, 40.9259523223))
        make_face()
        with BuildLine():
            ThreePointArc((-0.491063748, 42.7309602894), (-0.6492138876, 41.832092248), (-0.540192524, 40.9259523223))
            ThreePointArc((-0.540192524, 40.9259523223), (-0.0600975553, 40.9809636305), (0.421999424, 40.947798506))
            ThreePointArc((0.421999424, 40.947798506), (0.5033350527, 41.3438752528), (0.5306124489, 41.7472958987))
            ThreePointArc((0.5306124489, 41.7472958987), (0.4906334207, 42.2351725265), (0.3717630065, 42.7100322439))
            ThreePointArc((0.3717630065, 42.7100322439), (-0.0605612294, 42.6829431571), (-0.491063748, 42.7309602894))
        make_face()
        with BuildLine():
            ThreePointArc((0.9725766756, 42.879354984), (1.8101773995, 42.4330922426), (2.4662328709, 41.7472958987))
            ThreePointArc((2.4662328709, 41.7472958987), (2.5943243265, 42.2069741237), (2.6374925045, 42.6822088024))
            ThreePointArc((2.6374925045, 42.6822088024), (2.5361357873, 43.4063510394), (2.2398557502, 44.0748368681))
            ThreePointArc((2.2398557502, 44.0748368681), (1.7138333514, 43.363015613), (0.9725766756, 42.879354984))
        make_face()
        with BuildLine():
            ThreePointArc((2.2398557502, 44.0748368681), (2.3914491817, 44.4594873566), (2.4775093982, 44.8638760382))
            ThreePointArc((2.4775093982, 44.8638760382), (2.052765276, 44.8363480954), (1.6357329288, 44.7512048141))
            ThreePointArc((1.6357329288, 44.7512048141), (1.9670829423, 44.4391810302), (2.2398557502, 44.0748368681))
        make_face()
        with BuildLine():
            ThreePointArc((-0.3798256388, 43.0173942749), (-0.4389768968, 42.8755490315), (-0.491063748, 42.7309602894))
            ThreePointArc((-0.491063748, 42.7309602894), (-0.0605612294, 42.6829431571), (0.3717630065, 42.7100322439))
            ThreePointArc((0.3717630065, 42.7100322439), (0.3112261469, 42.8728194547), (0.2413607508, 43.0318264162))
            ThreePointArc((0.2413607508, 43.0318264162), (-0.0696074922, 43.0407531248), (-0.3798256388, 43.0173942749))
        make_face()
        with BuildLine():
            ThreePointArc((-0.0742141044, 43.5526568298), (-0.2402846028, 43.2925991344), (-0.3798256388, 43.0173942749))
            ThreePointArc((-0.3798256388, 43.0173942749), (-0.0696074922, 43.0407531248), (0.2413607508, 43.0318264162))
            ThreePointArc((0.2413607508, 43.0318264162), (0.0968371062, 43.3002782435), (-0.0742141044, 43.5526568298))
        make_face()
        with BuildLine():
            ThreePointArc((2.2398557502, 44.0748368681), (1.9670829423, 44.4391810302), (1.6357329288, 44.7512048141))
            ThreePointArc((1.6357329288, 44.7512048141), (0.6773924371, 44.2994026418), (-0.0742141044, 43.5526568298))
            ThreePointArc((-0.0742141044, 43.5526568298), (0.0968371062, 43.3002782435), (0.2413607508, 43.0318264162))
            ThreePointArc((0.2413607508, 43.0318264162), (0.6117376098, 42.9784611688), (0.9725766756, 42.879354984))
            ThreePointArc((0.9725766756, 42.879354984), (1.7138333514, 43.363015613), (2.2398557502, 44.0748368681))
        make_face()
        with BuildLine():
            ThreePointArc((0.3717630065, 42.7100322439), (0.677480511, 42.7758495822), (0.9725766756, 42.879354984))
            ThreePointArc((0.9725766756, 42.879354984), (0.6117376098, 42.9784611688), (0.2413607508, 43.0318264162))
            ThreePointArc((0.2413607508, 43.0318264162), (0.3112261469, 42.8728194547), (0.3717630065, 42.7100322439))
        make_face()
    extrude(amount=F6_DEPTH)


with BuildPart() as f6c:
    # F5 (on face) → F6, piece 3 (new body)
    with BuildSketch(Plane.XY.offset(10.16)):
        with BuildLine():
            ThreePointArc((26.5862698893, 5.6039789728), (24.0416234273, 9.536040219), (19.4122265529, 8.8253955532))
            Line((19.4122265529, 8.8253955532), (22.2759793267, 5.6039789728))
            Line((22.2759793267, 5.6039789728), (18.2400813608, 7.1172972945))
            ThreePointArc((18.2400813608, 7.1172972945), (21.5069826362, 1.3628412924), (26.5862698893, 5.6039789728))
        make_face()
    extrude(amount=F6_DEPTH)


with BuildPart() as f6d:
    # F5 (on face) → F6, piece 4 (new body)
    with BuildSketch(Plane.XY.offset(10.16)):
        with BuildLine():
            Line((-18.725927211, 13.0709217086), (-17.4350875922, 14.8123907189))
            ThreePointArc((-17.4350875922, 14.8123907189), (-20.6620511133, 12.0960342944), (-16.5582138454, 13.0709217086))
            ThreePointArc((-16.5582138454, 13.0709217086), (-16.6647793788, 13.742227041), (-16.9739983826, 14.347529172))
            Line((-16.9739983826, 14.347529172), (-18.725927211, 13.0709217086))
        make_face()
    extrude(amount=F6_DEPTH)


with BuildPart() as f6e:
    # F5 (on face) → F6, piece 5 (new body)
    with BuildSketch(Plane.XY.offset(10.16)):
        with BuildLine():
            ThreePointArc((27.4922685848, -5.1112035289), (25.1886055571, -1.5515168491), (20.9976224168, -2.194861953))
            Line((20.9976224168, -2.194861953), (23.5901717097, -5.1112035289))
            Line((23.5901717097, -5.1112035289), (19.9364818684, -3.7411996722))
            ThreePointArc((19.9364818684, -3.7411996722), (19.8244494224, -6.1337961548), (21.1312859186, -8.1410947299))
            Line((21.1312859186, -8.1410947299), (21.4592369578, -8.3800683329))
            ThreePointArc((21.4592369578, -8.3800683329), (25.4491023414, -8.5420542878), (27.4922685848, -5.1112035289))
        make_face()
    extrude(amount=F6_DEPTH)


with BuildPart() as f6f:
    # F5 (on face) → F6, piece 6 (new body)
    with BuildSketch(Plane.XY.offset(10.16)):
        with BuildLine():
            Line((-22.2759793267, 5.6039789728), (-19.4507515767, 8.7820590084))
            ThreePointArc((-19.4507515767, 8.7820590084), (-26.1551439841, 3.8620874397), (-18.0236735343, 5.6039789728))
            ThreePointArc((-18.0236735343, 5.6039789728), (-18.091896128, 6.3626306306), (-18.2943748273, 7.0969391739))
            Line((-18.2943748273, 7.0969391739), (-22.2759793267, 5.6039789728))
        make_face()
    extrude(amount=F6_DEPTH)


with BuildPart() as f6g:
    # F5 (on face) → F6, piece 7 (new body)
    with BuildSketch(Plane.XY.offset(10.16)):
        with BuildLine():
            ThreePointArc((28.4383269565, -11.7950867862), (26.8557407107, -9.6152373485), (24.2929523749, -10.4449594358))
            Line((24.2929523749, -10.4449594358), (26.1457748711, -11.7950867862))
            Line((26.1457748711, -11.7950867862), (23.9309171294, -11.2033095912))
            ThreePointArc((23.9309171294, -11.2033095912), (25.8473470492, -14.0681322981), (28.4383269565, -11.7950867862))
        make_face()
    extrude(amount=F6_DEPTH)


with BuildPart() as f6h:
    # F5 (on face) → F6, piece 8 (new body)
    with BuildSketch(Plane.XY.offset(10.16)):
        with BuildLine():
            Line((-23.5901717097, -5.1112035289), (-21.0011293185, -2.1988068435))
            ThreePointArc((-21.0011293185, -2.1988068435), (-27.4824109739, -4.9223425581), (-21.2952614562, -8.2605815445))
            ThreePointArc((-21.2952614562, -8.2605815445), (-20.1168416184, -6.8778877208), (-19.6933531411, -5.1112035289))
            ThreePointArc((-19.6933531411, -5.1112035289), (-19.7558724148, -4.4159741612), (-19.9414241586, -3.7430528554))
            Line((-19.9414241586, -3.7430528554), (-23.5901717097, -5.1112035289))
        make_face()
    extrude(amount=F6_DEPTH)


with BuildPart() as f6i:
    # F5 (on face) → F6, piece 9 (new body)
    with BuildSketch(Plane.XY.offset(10.16)):
        with BuildLine():
            Line((-26.1457748711, -11.7950867862), (-24.3694626867, -10.5007114924))
            ThreePointArc((-24.3694626867, -10.5007114924), (-28.2356097712, -12.4757353502), (-23.9478912578, -11.7950867862))
            ThreePointArc((-23.9478912578, -11.7950867862), (-23.9665923283, -11.5089822201), (-24.0223772972, -11.2277463938))
            Line((-24.0223772972, -11.2277463938), (-26.1457748711, -11.7950867862))
        make_face()
    extrude(amount=F6_DEPTH)


with BuildPart() as f6j:
    # F5 (on face) → F6, piece 10 (new body)
    with BuildSketch(Plane.XY.offset(10.16)):
        with BuildLine():
            ThreePointArc((36.8241791531, -23.0004175437), (32.981912388, -17.7071827937), (26.75867921, -19.7203188608))
            Line((26.75867921, -19.7203188608), (31.2569774687, -23.0004175437))
            Line((31.2569774687, -23.0004175437), (25.6897757844, -23.0004175437))
            ThreePointArc((25.6897757844, -23.0004175437), (31.2569774687, -28.567619228), (36.8241791531, -23.0004175437))
        make_face()
    extrude(amount=F6_DEPTH)


with BuildPart() as f6k:
    # F5 (on face) → F6, piece 11 (new body)
    with BuildSketch(Plane.XY.offset(10.16)):
        with BuildLine():
            Line((-31.2569774687, -23.0004175437), (-26.3099207792, -19.3930902394))
            ThreePointArc((-26.3099207792, -19.3930902394), (-37.0782749624, -24.8974351136), (-25.1343816002, -23.0004175437))
            Line((-25.1343816002, -23.0004175437), (-31.2569774687, -23.0004175437))
        make_face()
    extrude(amount=F6_DEPTH)


solid = Compound([f1.part, f6.part, f6b.part, f6c.part, f6d.part, f6e.part, f6f.part, f6g.part, f6h.part, f6i.part, f6j.part, f6k.part])
